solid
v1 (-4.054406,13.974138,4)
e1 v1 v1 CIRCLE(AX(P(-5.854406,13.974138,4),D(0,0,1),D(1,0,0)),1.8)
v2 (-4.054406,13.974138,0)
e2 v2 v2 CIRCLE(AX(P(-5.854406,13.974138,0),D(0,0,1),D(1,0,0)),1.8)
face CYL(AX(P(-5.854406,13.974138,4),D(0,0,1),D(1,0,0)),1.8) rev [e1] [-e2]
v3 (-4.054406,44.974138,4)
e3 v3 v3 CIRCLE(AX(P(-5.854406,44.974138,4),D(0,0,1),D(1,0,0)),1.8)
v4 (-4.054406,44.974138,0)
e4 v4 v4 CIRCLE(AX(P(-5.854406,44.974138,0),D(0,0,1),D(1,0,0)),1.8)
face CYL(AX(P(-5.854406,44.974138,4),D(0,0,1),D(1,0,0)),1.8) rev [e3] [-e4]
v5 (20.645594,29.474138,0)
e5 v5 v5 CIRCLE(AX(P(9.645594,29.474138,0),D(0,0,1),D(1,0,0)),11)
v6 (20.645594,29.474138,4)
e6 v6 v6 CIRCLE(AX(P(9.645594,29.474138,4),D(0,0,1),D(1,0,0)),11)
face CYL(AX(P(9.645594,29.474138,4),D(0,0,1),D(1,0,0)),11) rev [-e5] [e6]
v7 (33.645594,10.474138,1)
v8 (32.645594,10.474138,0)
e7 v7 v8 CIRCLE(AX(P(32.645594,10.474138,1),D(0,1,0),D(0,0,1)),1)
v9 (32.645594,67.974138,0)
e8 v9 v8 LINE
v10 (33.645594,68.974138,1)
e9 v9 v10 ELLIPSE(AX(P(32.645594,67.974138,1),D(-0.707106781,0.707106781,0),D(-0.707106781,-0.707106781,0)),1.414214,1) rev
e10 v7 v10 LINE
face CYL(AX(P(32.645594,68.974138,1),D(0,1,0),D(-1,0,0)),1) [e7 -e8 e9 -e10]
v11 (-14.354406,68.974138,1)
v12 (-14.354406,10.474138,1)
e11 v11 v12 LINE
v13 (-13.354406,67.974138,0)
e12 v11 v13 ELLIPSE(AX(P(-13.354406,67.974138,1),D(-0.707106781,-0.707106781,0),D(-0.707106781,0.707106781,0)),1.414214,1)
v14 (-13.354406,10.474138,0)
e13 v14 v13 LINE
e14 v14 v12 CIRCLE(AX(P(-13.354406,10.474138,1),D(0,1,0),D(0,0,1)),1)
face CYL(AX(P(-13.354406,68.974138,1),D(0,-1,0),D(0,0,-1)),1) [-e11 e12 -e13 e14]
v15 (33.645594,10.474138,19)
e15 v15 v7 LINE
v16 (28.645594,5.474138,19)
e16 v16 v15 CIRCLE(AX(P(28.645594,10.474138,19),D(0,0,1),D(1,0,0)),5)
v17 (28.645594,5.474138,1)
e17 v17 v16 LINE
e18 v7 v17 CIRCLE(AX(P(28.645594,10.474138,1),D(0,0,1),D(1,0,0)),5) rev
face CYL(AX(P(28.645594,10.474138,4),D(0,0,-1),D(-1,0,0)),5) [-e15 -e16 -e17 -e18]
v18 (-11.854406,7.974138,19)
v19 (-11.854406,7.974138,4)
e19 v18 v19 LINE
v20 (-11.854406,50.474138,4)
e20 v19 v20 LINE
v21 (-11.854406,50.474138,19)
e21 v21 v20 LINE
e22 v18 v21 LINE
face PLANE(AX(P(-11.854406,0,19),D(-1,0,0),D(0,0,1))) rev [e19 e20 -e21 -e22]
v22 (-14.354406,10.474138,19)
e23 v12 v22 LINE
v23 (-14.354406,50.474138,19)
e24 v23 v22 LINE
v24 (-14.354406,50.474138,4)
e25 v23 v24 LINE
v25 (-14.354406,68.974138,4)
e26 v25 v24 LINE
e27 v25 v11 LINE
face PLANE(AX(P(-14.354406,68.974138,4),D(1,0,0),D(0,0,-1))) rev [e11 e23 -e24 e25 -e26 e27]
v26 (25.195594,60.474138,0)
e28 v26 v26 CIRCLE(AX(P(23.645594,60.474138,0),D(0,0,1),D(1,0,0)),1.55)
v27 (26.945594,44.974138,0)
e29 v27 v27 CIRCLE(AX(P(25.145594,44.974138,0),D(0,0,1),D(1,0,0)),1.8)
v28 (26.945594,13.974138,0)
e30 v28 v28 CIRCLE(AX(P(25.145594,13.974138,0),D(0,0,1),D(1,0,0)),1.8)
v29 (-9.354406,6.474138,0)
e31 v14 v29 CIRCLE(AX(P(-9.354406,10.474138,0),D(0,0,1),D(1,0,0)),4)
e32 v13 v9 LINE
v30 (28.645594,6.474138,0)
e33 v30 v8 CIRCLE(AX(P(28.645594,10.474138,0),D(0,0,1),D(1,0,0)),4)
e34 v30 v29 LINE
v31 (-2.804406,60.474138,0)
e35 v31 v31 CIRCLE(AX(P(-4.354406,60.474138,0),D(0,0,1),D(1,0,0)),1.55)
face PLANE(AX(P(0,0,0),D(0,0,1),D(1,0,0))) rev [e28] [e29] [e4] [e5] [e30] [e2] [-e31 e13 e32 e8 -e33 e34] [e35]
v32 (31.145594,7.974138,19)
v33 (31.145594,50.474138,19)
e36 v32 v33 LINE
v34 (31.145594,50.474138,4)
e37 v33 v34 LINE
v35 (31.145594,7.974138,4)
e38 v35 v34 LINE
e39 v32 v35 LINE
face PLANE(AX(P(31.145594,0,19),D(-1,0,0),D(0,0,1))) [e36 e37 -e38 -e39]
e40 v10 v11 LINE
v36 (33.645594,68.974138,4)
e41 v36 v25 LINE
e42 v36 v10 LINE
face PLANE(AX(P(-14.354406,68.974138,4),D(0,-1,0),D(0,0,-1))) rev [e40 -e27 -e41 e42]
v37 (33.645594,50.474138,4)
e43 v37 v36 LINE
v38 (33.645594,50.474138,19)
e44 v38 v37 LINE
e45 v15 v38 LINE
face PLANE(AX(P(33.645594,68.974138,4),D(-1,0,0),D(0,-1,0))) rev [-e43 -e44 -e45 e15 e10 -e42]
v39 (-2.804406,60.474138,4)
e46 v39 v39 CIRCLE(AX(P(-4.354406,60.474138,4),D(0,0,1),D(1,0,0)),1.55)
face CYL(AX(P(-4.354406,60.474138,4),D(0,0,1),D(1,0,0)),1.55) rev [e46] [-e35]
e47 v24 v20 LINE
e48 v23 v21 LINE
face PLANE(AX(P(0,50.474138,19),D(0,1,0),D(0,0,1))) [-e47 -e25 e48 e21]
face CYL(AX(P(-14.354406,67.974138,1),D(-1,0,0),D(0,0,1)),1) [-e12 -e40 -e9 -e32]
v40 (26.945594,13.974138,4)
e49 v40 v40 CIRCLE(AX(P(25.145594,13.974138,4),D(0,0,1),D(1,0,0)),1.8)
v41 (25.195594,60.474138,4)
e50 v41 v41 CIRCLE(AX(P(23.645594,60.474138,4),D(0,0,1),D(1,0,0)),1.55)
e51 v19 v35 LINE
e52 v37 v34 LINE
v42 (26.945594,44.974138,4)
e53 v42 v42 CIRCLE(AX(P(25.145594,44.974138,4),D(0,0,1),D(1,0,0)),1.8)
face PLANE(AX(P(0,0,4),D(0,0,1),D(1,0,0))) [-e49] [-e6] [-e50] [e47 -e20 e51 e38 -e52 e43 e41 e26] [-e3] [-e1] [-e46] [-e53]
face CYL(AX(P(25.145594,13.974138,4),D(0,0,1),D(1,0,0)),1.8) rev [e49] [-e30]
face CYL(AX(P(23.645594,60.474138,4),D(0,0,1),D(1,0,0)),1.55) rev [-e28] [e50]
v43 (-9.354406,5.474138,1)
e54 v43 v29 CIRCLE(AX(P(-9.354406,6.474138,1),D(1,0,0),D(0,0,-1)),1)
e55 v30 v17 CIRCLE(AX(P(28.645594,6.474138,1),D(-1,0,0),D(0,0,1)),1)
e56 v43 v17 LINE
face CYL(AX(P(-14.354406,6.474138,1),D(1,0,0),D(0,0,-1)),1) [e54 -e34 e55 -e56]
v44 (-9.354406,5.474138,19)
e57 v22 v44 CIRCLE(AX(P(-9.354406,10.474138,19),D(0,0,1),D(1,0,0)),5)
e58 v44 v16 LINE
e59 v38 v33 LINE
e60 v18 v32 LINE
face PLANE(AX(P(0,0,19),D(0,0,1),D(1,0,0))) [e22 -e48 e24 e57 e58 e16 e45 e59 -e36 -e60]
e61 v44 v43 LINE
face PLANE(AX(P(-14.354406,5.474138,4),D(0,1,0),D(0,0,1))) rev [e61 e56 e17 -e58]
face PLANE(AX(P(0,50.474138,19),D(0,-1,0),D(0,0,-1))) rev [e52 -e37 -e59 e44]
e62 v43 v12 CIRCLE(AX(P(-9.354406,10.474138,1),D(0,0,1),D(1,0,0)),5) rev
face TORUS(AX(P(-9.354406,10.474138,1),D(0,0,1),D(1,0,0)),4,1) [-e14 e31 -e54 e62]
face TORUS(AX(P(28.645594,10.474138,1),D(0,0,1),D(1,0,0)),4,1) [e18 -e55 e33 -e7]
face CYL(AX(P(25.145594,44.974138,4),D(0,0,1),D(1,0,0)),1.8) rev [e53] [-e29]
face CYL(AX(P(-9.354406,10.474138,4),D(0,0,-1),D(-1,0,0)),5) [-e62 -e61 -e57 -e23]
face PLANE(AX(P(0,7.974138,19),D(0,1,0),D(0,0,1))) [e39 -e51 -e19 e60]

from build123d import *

# Parameters (mm, degrees)
ESQUISSE1_W                     = 48
ESQUISSE1_H                     = 63.5
BOSS_EXTRU_1_DEPTH              = 4
CONG_1_R                        = 1
DIAM_TRE_DU_PER_AGE_22_0_22_1_D = 22
D_GAGEMENT_M31_D                = 3.6
R_P_TITION_LIN_AIRE1_COUNT      = 2
R_P_TITION_LIN_AIRE1_PITCH      = 31
R_P_TITION_LIN_AIRE2_COUNT      = 2
R_P_TITION_LIN_AIRE2_PITCH      = 31
R_P_TITION_LIN_AIRE2_COPY_1_D   = 3.6
D_GAGEMENT_M2_54_D              = 3.1
ESQUISSE19_W                    = 18.410058986
ESQUISSE19_H                    = 2.5
ESQUISSE19_W_2                  = 24.589941014
BOSS_EXTRU_2_DEPTH              = 15
CONG_2_R                        = 5


with BuildPart() as part:
    # Esquisse1 → Boss.-Extru.1 (new body)
    with BuildSketch(Plane.XY):
        with Locations((9.64559387, 37.224137931)):
            Rectangle(ESQUISSE1_W, ESQUISSE1_H)
    extrude(amount=BOSS_EXTRU_1_DEPTH)

    # Congé1
    cong_1_edges = [part.edges().sort_by_distance(p)[0] for p in [
        (9.64559387, 68.974137931, 0),
        (33.64559387, 37.224137931, 0),
        (9.64559387, 5.474137931, 0),
        (-14.35440613, 37.224137931, 0),
    ]]
    fillet(cong_1_edges, radius=CONG_1_R)

    # Diamètre du perçage Ø22.0 (22)1 (through all)
    with Locations(Plane.XY.offset(4)):
        with Locations((9.64559387, 29.474137931)):
            Hole(DIAM_TRE_DU_PER_AGE_22_0_22_1_D / 2)

    # Dégagement M31 (through all)
    with Locations(Plane.XY.offset(4)):
        with Locations((-5.85440613, 44.974137931)):
            d_gagement_m31 = Hole(D_GAGEMENT_M31_D / 2)

    # Répétition linéaire1: Dégagement M31 ×2
    with Locations(*[(i * R_P_TITION_LIN_AIRE1_PITCH, 0, 0) for i in range(1, R_P_TITION_LIN_AIRE1_COUNT)]):
        add(d_gagement_m31, mode=Mode.SUBTRACT)

    # Répétition linéaire2: Dégagement M31 ×2
    with Locations(*[(0, -i * R_P_TITION_LIN_AIRE2_PITCH, 0) for i in range(1, R_P_TITION_LIN_AIRE2_COUNT)]):
        add(d_gagement_m31, mode=Mode.SUBTRACT)

    # Répétition linéaire2 copy 1 (through all)
    with Locations(Plane(origin=(31, -31, 4), x_dir=(1, 0, 0), z_dir=(0, 0, 1))):
        with Locations((-5.85440613, 44.974137931)):
            Hole(R_P_TITION_LIN_AIRE2_COPY_1_D / 2)

    # Dégagement M2.54 (through all)
    with Locations(Plane.XY.offset(4)):
        with Locations((-4.35440613, 60.474137931), (23.64559387, 60.474137931)):
            Hole(D_GAGEMENT_M2_54_D / 2)

    # Esquisse19 → Boss.-Extru.2 (add)
    with BuildSketch(Plane.XY.offset(4)):
        Polygon((-14.35440613, 50.474137931), (-14.35440613, 5.474137931), (-11.85440613, 5.474137931), (-11.85440613, 7.974137931), (-11.85440613, 50.474137931), align=None)
        with Locations((-2.649376637, 6.724137931)):
            Rectangle(ESQUISSE19_W, ESQUISSE19_H)
        with Locations((18.850623363, 6.724137931)):
            Rectangle(ESQUISSE19_W_2, ESQUISSE19_H)
        Polygon((31.14559387, 7.974137931), (31.14559387, 5.474137931), (33.64559387, 5.474137931), (33.64559387, 50.474137931), (31.14559387, 50.474137931), align=None)
    extrude(amount=BOSS_EXTRU_2_DEPTH)

    # Congé2
    # the kernel refuses this fillet: 5 mm, written as the material it takes off along each edge
    with BuildSketch(Plane(origin=(-9.35440613, 10.474137931, 0), x_dir=(0, -1, 0), z_dir=(1, 0, 0))) as cong_2_piece_1:
        with BuildLine():
            CenterArc((4, -1), 1, 0, 90)
            Line((5, -1), (5, 0))
            Line((5, 0), (4, 0))
        make_face()
    revolve(axis=Axis((-9.35440613, 10.474137931, 0), (0, 0, -1)), revolution_arc=90, mode=Mode.SUBTRACT)
    with BuildSketch(Plane(origin=(28.64559387, 10.474137931, 0), x_dir=(1, 0, 0), z_dir=(0, 1, 0))) as cong_2_piece_2:
        with BuildLine():
            CenterArc((4, -1), 1, 0, 90)
            Line((5, -1), (5, 0))
            Line((5, 0), (4, 0))
        make_face()
    revolve(axis=Axis((28.64559387, 10.474137931, 0), (0, 0, -1)), revolution_arc=90, mode=Mode.SUBTRACT)
    with BuildSketch(Plane(origin=(33.64559387, 5.474137931, 31.5), x_dir=(0, 1, 0), z_dir=(0, 0, -1))) as cong_2_piece_3:
        with BuildLine():
            CenterArc((CONG_2_R, -CONG_2_R), CONG_2_R, 90, 90)
            Line((0, -CONG_2_R), (0, 0))
            Line((0, 0), (CONG_2_R, 0))
        make_face()
    extrude(amount=31.5, mode=Mode.SUBTRACT)
    with BuildSketch(Plane(origin=(-14.35440613, 5.474137931, 0), x_dir=(1, 0, 0), z_dir=(0, 0, 1))) as cong_2_piece_4:
        with BuildLine():
            CenterArc((CONG_2_R, CONG_2_R), CONG_2_R, 180, 90)
            Line((0, CONG_2_R), (0, 0))
            Line((0, 0), (CONG_2_R, 0))
        make_face()
    extrude(amount=31.5, mode=Mode.SUBTRACT)


solid = part.part
